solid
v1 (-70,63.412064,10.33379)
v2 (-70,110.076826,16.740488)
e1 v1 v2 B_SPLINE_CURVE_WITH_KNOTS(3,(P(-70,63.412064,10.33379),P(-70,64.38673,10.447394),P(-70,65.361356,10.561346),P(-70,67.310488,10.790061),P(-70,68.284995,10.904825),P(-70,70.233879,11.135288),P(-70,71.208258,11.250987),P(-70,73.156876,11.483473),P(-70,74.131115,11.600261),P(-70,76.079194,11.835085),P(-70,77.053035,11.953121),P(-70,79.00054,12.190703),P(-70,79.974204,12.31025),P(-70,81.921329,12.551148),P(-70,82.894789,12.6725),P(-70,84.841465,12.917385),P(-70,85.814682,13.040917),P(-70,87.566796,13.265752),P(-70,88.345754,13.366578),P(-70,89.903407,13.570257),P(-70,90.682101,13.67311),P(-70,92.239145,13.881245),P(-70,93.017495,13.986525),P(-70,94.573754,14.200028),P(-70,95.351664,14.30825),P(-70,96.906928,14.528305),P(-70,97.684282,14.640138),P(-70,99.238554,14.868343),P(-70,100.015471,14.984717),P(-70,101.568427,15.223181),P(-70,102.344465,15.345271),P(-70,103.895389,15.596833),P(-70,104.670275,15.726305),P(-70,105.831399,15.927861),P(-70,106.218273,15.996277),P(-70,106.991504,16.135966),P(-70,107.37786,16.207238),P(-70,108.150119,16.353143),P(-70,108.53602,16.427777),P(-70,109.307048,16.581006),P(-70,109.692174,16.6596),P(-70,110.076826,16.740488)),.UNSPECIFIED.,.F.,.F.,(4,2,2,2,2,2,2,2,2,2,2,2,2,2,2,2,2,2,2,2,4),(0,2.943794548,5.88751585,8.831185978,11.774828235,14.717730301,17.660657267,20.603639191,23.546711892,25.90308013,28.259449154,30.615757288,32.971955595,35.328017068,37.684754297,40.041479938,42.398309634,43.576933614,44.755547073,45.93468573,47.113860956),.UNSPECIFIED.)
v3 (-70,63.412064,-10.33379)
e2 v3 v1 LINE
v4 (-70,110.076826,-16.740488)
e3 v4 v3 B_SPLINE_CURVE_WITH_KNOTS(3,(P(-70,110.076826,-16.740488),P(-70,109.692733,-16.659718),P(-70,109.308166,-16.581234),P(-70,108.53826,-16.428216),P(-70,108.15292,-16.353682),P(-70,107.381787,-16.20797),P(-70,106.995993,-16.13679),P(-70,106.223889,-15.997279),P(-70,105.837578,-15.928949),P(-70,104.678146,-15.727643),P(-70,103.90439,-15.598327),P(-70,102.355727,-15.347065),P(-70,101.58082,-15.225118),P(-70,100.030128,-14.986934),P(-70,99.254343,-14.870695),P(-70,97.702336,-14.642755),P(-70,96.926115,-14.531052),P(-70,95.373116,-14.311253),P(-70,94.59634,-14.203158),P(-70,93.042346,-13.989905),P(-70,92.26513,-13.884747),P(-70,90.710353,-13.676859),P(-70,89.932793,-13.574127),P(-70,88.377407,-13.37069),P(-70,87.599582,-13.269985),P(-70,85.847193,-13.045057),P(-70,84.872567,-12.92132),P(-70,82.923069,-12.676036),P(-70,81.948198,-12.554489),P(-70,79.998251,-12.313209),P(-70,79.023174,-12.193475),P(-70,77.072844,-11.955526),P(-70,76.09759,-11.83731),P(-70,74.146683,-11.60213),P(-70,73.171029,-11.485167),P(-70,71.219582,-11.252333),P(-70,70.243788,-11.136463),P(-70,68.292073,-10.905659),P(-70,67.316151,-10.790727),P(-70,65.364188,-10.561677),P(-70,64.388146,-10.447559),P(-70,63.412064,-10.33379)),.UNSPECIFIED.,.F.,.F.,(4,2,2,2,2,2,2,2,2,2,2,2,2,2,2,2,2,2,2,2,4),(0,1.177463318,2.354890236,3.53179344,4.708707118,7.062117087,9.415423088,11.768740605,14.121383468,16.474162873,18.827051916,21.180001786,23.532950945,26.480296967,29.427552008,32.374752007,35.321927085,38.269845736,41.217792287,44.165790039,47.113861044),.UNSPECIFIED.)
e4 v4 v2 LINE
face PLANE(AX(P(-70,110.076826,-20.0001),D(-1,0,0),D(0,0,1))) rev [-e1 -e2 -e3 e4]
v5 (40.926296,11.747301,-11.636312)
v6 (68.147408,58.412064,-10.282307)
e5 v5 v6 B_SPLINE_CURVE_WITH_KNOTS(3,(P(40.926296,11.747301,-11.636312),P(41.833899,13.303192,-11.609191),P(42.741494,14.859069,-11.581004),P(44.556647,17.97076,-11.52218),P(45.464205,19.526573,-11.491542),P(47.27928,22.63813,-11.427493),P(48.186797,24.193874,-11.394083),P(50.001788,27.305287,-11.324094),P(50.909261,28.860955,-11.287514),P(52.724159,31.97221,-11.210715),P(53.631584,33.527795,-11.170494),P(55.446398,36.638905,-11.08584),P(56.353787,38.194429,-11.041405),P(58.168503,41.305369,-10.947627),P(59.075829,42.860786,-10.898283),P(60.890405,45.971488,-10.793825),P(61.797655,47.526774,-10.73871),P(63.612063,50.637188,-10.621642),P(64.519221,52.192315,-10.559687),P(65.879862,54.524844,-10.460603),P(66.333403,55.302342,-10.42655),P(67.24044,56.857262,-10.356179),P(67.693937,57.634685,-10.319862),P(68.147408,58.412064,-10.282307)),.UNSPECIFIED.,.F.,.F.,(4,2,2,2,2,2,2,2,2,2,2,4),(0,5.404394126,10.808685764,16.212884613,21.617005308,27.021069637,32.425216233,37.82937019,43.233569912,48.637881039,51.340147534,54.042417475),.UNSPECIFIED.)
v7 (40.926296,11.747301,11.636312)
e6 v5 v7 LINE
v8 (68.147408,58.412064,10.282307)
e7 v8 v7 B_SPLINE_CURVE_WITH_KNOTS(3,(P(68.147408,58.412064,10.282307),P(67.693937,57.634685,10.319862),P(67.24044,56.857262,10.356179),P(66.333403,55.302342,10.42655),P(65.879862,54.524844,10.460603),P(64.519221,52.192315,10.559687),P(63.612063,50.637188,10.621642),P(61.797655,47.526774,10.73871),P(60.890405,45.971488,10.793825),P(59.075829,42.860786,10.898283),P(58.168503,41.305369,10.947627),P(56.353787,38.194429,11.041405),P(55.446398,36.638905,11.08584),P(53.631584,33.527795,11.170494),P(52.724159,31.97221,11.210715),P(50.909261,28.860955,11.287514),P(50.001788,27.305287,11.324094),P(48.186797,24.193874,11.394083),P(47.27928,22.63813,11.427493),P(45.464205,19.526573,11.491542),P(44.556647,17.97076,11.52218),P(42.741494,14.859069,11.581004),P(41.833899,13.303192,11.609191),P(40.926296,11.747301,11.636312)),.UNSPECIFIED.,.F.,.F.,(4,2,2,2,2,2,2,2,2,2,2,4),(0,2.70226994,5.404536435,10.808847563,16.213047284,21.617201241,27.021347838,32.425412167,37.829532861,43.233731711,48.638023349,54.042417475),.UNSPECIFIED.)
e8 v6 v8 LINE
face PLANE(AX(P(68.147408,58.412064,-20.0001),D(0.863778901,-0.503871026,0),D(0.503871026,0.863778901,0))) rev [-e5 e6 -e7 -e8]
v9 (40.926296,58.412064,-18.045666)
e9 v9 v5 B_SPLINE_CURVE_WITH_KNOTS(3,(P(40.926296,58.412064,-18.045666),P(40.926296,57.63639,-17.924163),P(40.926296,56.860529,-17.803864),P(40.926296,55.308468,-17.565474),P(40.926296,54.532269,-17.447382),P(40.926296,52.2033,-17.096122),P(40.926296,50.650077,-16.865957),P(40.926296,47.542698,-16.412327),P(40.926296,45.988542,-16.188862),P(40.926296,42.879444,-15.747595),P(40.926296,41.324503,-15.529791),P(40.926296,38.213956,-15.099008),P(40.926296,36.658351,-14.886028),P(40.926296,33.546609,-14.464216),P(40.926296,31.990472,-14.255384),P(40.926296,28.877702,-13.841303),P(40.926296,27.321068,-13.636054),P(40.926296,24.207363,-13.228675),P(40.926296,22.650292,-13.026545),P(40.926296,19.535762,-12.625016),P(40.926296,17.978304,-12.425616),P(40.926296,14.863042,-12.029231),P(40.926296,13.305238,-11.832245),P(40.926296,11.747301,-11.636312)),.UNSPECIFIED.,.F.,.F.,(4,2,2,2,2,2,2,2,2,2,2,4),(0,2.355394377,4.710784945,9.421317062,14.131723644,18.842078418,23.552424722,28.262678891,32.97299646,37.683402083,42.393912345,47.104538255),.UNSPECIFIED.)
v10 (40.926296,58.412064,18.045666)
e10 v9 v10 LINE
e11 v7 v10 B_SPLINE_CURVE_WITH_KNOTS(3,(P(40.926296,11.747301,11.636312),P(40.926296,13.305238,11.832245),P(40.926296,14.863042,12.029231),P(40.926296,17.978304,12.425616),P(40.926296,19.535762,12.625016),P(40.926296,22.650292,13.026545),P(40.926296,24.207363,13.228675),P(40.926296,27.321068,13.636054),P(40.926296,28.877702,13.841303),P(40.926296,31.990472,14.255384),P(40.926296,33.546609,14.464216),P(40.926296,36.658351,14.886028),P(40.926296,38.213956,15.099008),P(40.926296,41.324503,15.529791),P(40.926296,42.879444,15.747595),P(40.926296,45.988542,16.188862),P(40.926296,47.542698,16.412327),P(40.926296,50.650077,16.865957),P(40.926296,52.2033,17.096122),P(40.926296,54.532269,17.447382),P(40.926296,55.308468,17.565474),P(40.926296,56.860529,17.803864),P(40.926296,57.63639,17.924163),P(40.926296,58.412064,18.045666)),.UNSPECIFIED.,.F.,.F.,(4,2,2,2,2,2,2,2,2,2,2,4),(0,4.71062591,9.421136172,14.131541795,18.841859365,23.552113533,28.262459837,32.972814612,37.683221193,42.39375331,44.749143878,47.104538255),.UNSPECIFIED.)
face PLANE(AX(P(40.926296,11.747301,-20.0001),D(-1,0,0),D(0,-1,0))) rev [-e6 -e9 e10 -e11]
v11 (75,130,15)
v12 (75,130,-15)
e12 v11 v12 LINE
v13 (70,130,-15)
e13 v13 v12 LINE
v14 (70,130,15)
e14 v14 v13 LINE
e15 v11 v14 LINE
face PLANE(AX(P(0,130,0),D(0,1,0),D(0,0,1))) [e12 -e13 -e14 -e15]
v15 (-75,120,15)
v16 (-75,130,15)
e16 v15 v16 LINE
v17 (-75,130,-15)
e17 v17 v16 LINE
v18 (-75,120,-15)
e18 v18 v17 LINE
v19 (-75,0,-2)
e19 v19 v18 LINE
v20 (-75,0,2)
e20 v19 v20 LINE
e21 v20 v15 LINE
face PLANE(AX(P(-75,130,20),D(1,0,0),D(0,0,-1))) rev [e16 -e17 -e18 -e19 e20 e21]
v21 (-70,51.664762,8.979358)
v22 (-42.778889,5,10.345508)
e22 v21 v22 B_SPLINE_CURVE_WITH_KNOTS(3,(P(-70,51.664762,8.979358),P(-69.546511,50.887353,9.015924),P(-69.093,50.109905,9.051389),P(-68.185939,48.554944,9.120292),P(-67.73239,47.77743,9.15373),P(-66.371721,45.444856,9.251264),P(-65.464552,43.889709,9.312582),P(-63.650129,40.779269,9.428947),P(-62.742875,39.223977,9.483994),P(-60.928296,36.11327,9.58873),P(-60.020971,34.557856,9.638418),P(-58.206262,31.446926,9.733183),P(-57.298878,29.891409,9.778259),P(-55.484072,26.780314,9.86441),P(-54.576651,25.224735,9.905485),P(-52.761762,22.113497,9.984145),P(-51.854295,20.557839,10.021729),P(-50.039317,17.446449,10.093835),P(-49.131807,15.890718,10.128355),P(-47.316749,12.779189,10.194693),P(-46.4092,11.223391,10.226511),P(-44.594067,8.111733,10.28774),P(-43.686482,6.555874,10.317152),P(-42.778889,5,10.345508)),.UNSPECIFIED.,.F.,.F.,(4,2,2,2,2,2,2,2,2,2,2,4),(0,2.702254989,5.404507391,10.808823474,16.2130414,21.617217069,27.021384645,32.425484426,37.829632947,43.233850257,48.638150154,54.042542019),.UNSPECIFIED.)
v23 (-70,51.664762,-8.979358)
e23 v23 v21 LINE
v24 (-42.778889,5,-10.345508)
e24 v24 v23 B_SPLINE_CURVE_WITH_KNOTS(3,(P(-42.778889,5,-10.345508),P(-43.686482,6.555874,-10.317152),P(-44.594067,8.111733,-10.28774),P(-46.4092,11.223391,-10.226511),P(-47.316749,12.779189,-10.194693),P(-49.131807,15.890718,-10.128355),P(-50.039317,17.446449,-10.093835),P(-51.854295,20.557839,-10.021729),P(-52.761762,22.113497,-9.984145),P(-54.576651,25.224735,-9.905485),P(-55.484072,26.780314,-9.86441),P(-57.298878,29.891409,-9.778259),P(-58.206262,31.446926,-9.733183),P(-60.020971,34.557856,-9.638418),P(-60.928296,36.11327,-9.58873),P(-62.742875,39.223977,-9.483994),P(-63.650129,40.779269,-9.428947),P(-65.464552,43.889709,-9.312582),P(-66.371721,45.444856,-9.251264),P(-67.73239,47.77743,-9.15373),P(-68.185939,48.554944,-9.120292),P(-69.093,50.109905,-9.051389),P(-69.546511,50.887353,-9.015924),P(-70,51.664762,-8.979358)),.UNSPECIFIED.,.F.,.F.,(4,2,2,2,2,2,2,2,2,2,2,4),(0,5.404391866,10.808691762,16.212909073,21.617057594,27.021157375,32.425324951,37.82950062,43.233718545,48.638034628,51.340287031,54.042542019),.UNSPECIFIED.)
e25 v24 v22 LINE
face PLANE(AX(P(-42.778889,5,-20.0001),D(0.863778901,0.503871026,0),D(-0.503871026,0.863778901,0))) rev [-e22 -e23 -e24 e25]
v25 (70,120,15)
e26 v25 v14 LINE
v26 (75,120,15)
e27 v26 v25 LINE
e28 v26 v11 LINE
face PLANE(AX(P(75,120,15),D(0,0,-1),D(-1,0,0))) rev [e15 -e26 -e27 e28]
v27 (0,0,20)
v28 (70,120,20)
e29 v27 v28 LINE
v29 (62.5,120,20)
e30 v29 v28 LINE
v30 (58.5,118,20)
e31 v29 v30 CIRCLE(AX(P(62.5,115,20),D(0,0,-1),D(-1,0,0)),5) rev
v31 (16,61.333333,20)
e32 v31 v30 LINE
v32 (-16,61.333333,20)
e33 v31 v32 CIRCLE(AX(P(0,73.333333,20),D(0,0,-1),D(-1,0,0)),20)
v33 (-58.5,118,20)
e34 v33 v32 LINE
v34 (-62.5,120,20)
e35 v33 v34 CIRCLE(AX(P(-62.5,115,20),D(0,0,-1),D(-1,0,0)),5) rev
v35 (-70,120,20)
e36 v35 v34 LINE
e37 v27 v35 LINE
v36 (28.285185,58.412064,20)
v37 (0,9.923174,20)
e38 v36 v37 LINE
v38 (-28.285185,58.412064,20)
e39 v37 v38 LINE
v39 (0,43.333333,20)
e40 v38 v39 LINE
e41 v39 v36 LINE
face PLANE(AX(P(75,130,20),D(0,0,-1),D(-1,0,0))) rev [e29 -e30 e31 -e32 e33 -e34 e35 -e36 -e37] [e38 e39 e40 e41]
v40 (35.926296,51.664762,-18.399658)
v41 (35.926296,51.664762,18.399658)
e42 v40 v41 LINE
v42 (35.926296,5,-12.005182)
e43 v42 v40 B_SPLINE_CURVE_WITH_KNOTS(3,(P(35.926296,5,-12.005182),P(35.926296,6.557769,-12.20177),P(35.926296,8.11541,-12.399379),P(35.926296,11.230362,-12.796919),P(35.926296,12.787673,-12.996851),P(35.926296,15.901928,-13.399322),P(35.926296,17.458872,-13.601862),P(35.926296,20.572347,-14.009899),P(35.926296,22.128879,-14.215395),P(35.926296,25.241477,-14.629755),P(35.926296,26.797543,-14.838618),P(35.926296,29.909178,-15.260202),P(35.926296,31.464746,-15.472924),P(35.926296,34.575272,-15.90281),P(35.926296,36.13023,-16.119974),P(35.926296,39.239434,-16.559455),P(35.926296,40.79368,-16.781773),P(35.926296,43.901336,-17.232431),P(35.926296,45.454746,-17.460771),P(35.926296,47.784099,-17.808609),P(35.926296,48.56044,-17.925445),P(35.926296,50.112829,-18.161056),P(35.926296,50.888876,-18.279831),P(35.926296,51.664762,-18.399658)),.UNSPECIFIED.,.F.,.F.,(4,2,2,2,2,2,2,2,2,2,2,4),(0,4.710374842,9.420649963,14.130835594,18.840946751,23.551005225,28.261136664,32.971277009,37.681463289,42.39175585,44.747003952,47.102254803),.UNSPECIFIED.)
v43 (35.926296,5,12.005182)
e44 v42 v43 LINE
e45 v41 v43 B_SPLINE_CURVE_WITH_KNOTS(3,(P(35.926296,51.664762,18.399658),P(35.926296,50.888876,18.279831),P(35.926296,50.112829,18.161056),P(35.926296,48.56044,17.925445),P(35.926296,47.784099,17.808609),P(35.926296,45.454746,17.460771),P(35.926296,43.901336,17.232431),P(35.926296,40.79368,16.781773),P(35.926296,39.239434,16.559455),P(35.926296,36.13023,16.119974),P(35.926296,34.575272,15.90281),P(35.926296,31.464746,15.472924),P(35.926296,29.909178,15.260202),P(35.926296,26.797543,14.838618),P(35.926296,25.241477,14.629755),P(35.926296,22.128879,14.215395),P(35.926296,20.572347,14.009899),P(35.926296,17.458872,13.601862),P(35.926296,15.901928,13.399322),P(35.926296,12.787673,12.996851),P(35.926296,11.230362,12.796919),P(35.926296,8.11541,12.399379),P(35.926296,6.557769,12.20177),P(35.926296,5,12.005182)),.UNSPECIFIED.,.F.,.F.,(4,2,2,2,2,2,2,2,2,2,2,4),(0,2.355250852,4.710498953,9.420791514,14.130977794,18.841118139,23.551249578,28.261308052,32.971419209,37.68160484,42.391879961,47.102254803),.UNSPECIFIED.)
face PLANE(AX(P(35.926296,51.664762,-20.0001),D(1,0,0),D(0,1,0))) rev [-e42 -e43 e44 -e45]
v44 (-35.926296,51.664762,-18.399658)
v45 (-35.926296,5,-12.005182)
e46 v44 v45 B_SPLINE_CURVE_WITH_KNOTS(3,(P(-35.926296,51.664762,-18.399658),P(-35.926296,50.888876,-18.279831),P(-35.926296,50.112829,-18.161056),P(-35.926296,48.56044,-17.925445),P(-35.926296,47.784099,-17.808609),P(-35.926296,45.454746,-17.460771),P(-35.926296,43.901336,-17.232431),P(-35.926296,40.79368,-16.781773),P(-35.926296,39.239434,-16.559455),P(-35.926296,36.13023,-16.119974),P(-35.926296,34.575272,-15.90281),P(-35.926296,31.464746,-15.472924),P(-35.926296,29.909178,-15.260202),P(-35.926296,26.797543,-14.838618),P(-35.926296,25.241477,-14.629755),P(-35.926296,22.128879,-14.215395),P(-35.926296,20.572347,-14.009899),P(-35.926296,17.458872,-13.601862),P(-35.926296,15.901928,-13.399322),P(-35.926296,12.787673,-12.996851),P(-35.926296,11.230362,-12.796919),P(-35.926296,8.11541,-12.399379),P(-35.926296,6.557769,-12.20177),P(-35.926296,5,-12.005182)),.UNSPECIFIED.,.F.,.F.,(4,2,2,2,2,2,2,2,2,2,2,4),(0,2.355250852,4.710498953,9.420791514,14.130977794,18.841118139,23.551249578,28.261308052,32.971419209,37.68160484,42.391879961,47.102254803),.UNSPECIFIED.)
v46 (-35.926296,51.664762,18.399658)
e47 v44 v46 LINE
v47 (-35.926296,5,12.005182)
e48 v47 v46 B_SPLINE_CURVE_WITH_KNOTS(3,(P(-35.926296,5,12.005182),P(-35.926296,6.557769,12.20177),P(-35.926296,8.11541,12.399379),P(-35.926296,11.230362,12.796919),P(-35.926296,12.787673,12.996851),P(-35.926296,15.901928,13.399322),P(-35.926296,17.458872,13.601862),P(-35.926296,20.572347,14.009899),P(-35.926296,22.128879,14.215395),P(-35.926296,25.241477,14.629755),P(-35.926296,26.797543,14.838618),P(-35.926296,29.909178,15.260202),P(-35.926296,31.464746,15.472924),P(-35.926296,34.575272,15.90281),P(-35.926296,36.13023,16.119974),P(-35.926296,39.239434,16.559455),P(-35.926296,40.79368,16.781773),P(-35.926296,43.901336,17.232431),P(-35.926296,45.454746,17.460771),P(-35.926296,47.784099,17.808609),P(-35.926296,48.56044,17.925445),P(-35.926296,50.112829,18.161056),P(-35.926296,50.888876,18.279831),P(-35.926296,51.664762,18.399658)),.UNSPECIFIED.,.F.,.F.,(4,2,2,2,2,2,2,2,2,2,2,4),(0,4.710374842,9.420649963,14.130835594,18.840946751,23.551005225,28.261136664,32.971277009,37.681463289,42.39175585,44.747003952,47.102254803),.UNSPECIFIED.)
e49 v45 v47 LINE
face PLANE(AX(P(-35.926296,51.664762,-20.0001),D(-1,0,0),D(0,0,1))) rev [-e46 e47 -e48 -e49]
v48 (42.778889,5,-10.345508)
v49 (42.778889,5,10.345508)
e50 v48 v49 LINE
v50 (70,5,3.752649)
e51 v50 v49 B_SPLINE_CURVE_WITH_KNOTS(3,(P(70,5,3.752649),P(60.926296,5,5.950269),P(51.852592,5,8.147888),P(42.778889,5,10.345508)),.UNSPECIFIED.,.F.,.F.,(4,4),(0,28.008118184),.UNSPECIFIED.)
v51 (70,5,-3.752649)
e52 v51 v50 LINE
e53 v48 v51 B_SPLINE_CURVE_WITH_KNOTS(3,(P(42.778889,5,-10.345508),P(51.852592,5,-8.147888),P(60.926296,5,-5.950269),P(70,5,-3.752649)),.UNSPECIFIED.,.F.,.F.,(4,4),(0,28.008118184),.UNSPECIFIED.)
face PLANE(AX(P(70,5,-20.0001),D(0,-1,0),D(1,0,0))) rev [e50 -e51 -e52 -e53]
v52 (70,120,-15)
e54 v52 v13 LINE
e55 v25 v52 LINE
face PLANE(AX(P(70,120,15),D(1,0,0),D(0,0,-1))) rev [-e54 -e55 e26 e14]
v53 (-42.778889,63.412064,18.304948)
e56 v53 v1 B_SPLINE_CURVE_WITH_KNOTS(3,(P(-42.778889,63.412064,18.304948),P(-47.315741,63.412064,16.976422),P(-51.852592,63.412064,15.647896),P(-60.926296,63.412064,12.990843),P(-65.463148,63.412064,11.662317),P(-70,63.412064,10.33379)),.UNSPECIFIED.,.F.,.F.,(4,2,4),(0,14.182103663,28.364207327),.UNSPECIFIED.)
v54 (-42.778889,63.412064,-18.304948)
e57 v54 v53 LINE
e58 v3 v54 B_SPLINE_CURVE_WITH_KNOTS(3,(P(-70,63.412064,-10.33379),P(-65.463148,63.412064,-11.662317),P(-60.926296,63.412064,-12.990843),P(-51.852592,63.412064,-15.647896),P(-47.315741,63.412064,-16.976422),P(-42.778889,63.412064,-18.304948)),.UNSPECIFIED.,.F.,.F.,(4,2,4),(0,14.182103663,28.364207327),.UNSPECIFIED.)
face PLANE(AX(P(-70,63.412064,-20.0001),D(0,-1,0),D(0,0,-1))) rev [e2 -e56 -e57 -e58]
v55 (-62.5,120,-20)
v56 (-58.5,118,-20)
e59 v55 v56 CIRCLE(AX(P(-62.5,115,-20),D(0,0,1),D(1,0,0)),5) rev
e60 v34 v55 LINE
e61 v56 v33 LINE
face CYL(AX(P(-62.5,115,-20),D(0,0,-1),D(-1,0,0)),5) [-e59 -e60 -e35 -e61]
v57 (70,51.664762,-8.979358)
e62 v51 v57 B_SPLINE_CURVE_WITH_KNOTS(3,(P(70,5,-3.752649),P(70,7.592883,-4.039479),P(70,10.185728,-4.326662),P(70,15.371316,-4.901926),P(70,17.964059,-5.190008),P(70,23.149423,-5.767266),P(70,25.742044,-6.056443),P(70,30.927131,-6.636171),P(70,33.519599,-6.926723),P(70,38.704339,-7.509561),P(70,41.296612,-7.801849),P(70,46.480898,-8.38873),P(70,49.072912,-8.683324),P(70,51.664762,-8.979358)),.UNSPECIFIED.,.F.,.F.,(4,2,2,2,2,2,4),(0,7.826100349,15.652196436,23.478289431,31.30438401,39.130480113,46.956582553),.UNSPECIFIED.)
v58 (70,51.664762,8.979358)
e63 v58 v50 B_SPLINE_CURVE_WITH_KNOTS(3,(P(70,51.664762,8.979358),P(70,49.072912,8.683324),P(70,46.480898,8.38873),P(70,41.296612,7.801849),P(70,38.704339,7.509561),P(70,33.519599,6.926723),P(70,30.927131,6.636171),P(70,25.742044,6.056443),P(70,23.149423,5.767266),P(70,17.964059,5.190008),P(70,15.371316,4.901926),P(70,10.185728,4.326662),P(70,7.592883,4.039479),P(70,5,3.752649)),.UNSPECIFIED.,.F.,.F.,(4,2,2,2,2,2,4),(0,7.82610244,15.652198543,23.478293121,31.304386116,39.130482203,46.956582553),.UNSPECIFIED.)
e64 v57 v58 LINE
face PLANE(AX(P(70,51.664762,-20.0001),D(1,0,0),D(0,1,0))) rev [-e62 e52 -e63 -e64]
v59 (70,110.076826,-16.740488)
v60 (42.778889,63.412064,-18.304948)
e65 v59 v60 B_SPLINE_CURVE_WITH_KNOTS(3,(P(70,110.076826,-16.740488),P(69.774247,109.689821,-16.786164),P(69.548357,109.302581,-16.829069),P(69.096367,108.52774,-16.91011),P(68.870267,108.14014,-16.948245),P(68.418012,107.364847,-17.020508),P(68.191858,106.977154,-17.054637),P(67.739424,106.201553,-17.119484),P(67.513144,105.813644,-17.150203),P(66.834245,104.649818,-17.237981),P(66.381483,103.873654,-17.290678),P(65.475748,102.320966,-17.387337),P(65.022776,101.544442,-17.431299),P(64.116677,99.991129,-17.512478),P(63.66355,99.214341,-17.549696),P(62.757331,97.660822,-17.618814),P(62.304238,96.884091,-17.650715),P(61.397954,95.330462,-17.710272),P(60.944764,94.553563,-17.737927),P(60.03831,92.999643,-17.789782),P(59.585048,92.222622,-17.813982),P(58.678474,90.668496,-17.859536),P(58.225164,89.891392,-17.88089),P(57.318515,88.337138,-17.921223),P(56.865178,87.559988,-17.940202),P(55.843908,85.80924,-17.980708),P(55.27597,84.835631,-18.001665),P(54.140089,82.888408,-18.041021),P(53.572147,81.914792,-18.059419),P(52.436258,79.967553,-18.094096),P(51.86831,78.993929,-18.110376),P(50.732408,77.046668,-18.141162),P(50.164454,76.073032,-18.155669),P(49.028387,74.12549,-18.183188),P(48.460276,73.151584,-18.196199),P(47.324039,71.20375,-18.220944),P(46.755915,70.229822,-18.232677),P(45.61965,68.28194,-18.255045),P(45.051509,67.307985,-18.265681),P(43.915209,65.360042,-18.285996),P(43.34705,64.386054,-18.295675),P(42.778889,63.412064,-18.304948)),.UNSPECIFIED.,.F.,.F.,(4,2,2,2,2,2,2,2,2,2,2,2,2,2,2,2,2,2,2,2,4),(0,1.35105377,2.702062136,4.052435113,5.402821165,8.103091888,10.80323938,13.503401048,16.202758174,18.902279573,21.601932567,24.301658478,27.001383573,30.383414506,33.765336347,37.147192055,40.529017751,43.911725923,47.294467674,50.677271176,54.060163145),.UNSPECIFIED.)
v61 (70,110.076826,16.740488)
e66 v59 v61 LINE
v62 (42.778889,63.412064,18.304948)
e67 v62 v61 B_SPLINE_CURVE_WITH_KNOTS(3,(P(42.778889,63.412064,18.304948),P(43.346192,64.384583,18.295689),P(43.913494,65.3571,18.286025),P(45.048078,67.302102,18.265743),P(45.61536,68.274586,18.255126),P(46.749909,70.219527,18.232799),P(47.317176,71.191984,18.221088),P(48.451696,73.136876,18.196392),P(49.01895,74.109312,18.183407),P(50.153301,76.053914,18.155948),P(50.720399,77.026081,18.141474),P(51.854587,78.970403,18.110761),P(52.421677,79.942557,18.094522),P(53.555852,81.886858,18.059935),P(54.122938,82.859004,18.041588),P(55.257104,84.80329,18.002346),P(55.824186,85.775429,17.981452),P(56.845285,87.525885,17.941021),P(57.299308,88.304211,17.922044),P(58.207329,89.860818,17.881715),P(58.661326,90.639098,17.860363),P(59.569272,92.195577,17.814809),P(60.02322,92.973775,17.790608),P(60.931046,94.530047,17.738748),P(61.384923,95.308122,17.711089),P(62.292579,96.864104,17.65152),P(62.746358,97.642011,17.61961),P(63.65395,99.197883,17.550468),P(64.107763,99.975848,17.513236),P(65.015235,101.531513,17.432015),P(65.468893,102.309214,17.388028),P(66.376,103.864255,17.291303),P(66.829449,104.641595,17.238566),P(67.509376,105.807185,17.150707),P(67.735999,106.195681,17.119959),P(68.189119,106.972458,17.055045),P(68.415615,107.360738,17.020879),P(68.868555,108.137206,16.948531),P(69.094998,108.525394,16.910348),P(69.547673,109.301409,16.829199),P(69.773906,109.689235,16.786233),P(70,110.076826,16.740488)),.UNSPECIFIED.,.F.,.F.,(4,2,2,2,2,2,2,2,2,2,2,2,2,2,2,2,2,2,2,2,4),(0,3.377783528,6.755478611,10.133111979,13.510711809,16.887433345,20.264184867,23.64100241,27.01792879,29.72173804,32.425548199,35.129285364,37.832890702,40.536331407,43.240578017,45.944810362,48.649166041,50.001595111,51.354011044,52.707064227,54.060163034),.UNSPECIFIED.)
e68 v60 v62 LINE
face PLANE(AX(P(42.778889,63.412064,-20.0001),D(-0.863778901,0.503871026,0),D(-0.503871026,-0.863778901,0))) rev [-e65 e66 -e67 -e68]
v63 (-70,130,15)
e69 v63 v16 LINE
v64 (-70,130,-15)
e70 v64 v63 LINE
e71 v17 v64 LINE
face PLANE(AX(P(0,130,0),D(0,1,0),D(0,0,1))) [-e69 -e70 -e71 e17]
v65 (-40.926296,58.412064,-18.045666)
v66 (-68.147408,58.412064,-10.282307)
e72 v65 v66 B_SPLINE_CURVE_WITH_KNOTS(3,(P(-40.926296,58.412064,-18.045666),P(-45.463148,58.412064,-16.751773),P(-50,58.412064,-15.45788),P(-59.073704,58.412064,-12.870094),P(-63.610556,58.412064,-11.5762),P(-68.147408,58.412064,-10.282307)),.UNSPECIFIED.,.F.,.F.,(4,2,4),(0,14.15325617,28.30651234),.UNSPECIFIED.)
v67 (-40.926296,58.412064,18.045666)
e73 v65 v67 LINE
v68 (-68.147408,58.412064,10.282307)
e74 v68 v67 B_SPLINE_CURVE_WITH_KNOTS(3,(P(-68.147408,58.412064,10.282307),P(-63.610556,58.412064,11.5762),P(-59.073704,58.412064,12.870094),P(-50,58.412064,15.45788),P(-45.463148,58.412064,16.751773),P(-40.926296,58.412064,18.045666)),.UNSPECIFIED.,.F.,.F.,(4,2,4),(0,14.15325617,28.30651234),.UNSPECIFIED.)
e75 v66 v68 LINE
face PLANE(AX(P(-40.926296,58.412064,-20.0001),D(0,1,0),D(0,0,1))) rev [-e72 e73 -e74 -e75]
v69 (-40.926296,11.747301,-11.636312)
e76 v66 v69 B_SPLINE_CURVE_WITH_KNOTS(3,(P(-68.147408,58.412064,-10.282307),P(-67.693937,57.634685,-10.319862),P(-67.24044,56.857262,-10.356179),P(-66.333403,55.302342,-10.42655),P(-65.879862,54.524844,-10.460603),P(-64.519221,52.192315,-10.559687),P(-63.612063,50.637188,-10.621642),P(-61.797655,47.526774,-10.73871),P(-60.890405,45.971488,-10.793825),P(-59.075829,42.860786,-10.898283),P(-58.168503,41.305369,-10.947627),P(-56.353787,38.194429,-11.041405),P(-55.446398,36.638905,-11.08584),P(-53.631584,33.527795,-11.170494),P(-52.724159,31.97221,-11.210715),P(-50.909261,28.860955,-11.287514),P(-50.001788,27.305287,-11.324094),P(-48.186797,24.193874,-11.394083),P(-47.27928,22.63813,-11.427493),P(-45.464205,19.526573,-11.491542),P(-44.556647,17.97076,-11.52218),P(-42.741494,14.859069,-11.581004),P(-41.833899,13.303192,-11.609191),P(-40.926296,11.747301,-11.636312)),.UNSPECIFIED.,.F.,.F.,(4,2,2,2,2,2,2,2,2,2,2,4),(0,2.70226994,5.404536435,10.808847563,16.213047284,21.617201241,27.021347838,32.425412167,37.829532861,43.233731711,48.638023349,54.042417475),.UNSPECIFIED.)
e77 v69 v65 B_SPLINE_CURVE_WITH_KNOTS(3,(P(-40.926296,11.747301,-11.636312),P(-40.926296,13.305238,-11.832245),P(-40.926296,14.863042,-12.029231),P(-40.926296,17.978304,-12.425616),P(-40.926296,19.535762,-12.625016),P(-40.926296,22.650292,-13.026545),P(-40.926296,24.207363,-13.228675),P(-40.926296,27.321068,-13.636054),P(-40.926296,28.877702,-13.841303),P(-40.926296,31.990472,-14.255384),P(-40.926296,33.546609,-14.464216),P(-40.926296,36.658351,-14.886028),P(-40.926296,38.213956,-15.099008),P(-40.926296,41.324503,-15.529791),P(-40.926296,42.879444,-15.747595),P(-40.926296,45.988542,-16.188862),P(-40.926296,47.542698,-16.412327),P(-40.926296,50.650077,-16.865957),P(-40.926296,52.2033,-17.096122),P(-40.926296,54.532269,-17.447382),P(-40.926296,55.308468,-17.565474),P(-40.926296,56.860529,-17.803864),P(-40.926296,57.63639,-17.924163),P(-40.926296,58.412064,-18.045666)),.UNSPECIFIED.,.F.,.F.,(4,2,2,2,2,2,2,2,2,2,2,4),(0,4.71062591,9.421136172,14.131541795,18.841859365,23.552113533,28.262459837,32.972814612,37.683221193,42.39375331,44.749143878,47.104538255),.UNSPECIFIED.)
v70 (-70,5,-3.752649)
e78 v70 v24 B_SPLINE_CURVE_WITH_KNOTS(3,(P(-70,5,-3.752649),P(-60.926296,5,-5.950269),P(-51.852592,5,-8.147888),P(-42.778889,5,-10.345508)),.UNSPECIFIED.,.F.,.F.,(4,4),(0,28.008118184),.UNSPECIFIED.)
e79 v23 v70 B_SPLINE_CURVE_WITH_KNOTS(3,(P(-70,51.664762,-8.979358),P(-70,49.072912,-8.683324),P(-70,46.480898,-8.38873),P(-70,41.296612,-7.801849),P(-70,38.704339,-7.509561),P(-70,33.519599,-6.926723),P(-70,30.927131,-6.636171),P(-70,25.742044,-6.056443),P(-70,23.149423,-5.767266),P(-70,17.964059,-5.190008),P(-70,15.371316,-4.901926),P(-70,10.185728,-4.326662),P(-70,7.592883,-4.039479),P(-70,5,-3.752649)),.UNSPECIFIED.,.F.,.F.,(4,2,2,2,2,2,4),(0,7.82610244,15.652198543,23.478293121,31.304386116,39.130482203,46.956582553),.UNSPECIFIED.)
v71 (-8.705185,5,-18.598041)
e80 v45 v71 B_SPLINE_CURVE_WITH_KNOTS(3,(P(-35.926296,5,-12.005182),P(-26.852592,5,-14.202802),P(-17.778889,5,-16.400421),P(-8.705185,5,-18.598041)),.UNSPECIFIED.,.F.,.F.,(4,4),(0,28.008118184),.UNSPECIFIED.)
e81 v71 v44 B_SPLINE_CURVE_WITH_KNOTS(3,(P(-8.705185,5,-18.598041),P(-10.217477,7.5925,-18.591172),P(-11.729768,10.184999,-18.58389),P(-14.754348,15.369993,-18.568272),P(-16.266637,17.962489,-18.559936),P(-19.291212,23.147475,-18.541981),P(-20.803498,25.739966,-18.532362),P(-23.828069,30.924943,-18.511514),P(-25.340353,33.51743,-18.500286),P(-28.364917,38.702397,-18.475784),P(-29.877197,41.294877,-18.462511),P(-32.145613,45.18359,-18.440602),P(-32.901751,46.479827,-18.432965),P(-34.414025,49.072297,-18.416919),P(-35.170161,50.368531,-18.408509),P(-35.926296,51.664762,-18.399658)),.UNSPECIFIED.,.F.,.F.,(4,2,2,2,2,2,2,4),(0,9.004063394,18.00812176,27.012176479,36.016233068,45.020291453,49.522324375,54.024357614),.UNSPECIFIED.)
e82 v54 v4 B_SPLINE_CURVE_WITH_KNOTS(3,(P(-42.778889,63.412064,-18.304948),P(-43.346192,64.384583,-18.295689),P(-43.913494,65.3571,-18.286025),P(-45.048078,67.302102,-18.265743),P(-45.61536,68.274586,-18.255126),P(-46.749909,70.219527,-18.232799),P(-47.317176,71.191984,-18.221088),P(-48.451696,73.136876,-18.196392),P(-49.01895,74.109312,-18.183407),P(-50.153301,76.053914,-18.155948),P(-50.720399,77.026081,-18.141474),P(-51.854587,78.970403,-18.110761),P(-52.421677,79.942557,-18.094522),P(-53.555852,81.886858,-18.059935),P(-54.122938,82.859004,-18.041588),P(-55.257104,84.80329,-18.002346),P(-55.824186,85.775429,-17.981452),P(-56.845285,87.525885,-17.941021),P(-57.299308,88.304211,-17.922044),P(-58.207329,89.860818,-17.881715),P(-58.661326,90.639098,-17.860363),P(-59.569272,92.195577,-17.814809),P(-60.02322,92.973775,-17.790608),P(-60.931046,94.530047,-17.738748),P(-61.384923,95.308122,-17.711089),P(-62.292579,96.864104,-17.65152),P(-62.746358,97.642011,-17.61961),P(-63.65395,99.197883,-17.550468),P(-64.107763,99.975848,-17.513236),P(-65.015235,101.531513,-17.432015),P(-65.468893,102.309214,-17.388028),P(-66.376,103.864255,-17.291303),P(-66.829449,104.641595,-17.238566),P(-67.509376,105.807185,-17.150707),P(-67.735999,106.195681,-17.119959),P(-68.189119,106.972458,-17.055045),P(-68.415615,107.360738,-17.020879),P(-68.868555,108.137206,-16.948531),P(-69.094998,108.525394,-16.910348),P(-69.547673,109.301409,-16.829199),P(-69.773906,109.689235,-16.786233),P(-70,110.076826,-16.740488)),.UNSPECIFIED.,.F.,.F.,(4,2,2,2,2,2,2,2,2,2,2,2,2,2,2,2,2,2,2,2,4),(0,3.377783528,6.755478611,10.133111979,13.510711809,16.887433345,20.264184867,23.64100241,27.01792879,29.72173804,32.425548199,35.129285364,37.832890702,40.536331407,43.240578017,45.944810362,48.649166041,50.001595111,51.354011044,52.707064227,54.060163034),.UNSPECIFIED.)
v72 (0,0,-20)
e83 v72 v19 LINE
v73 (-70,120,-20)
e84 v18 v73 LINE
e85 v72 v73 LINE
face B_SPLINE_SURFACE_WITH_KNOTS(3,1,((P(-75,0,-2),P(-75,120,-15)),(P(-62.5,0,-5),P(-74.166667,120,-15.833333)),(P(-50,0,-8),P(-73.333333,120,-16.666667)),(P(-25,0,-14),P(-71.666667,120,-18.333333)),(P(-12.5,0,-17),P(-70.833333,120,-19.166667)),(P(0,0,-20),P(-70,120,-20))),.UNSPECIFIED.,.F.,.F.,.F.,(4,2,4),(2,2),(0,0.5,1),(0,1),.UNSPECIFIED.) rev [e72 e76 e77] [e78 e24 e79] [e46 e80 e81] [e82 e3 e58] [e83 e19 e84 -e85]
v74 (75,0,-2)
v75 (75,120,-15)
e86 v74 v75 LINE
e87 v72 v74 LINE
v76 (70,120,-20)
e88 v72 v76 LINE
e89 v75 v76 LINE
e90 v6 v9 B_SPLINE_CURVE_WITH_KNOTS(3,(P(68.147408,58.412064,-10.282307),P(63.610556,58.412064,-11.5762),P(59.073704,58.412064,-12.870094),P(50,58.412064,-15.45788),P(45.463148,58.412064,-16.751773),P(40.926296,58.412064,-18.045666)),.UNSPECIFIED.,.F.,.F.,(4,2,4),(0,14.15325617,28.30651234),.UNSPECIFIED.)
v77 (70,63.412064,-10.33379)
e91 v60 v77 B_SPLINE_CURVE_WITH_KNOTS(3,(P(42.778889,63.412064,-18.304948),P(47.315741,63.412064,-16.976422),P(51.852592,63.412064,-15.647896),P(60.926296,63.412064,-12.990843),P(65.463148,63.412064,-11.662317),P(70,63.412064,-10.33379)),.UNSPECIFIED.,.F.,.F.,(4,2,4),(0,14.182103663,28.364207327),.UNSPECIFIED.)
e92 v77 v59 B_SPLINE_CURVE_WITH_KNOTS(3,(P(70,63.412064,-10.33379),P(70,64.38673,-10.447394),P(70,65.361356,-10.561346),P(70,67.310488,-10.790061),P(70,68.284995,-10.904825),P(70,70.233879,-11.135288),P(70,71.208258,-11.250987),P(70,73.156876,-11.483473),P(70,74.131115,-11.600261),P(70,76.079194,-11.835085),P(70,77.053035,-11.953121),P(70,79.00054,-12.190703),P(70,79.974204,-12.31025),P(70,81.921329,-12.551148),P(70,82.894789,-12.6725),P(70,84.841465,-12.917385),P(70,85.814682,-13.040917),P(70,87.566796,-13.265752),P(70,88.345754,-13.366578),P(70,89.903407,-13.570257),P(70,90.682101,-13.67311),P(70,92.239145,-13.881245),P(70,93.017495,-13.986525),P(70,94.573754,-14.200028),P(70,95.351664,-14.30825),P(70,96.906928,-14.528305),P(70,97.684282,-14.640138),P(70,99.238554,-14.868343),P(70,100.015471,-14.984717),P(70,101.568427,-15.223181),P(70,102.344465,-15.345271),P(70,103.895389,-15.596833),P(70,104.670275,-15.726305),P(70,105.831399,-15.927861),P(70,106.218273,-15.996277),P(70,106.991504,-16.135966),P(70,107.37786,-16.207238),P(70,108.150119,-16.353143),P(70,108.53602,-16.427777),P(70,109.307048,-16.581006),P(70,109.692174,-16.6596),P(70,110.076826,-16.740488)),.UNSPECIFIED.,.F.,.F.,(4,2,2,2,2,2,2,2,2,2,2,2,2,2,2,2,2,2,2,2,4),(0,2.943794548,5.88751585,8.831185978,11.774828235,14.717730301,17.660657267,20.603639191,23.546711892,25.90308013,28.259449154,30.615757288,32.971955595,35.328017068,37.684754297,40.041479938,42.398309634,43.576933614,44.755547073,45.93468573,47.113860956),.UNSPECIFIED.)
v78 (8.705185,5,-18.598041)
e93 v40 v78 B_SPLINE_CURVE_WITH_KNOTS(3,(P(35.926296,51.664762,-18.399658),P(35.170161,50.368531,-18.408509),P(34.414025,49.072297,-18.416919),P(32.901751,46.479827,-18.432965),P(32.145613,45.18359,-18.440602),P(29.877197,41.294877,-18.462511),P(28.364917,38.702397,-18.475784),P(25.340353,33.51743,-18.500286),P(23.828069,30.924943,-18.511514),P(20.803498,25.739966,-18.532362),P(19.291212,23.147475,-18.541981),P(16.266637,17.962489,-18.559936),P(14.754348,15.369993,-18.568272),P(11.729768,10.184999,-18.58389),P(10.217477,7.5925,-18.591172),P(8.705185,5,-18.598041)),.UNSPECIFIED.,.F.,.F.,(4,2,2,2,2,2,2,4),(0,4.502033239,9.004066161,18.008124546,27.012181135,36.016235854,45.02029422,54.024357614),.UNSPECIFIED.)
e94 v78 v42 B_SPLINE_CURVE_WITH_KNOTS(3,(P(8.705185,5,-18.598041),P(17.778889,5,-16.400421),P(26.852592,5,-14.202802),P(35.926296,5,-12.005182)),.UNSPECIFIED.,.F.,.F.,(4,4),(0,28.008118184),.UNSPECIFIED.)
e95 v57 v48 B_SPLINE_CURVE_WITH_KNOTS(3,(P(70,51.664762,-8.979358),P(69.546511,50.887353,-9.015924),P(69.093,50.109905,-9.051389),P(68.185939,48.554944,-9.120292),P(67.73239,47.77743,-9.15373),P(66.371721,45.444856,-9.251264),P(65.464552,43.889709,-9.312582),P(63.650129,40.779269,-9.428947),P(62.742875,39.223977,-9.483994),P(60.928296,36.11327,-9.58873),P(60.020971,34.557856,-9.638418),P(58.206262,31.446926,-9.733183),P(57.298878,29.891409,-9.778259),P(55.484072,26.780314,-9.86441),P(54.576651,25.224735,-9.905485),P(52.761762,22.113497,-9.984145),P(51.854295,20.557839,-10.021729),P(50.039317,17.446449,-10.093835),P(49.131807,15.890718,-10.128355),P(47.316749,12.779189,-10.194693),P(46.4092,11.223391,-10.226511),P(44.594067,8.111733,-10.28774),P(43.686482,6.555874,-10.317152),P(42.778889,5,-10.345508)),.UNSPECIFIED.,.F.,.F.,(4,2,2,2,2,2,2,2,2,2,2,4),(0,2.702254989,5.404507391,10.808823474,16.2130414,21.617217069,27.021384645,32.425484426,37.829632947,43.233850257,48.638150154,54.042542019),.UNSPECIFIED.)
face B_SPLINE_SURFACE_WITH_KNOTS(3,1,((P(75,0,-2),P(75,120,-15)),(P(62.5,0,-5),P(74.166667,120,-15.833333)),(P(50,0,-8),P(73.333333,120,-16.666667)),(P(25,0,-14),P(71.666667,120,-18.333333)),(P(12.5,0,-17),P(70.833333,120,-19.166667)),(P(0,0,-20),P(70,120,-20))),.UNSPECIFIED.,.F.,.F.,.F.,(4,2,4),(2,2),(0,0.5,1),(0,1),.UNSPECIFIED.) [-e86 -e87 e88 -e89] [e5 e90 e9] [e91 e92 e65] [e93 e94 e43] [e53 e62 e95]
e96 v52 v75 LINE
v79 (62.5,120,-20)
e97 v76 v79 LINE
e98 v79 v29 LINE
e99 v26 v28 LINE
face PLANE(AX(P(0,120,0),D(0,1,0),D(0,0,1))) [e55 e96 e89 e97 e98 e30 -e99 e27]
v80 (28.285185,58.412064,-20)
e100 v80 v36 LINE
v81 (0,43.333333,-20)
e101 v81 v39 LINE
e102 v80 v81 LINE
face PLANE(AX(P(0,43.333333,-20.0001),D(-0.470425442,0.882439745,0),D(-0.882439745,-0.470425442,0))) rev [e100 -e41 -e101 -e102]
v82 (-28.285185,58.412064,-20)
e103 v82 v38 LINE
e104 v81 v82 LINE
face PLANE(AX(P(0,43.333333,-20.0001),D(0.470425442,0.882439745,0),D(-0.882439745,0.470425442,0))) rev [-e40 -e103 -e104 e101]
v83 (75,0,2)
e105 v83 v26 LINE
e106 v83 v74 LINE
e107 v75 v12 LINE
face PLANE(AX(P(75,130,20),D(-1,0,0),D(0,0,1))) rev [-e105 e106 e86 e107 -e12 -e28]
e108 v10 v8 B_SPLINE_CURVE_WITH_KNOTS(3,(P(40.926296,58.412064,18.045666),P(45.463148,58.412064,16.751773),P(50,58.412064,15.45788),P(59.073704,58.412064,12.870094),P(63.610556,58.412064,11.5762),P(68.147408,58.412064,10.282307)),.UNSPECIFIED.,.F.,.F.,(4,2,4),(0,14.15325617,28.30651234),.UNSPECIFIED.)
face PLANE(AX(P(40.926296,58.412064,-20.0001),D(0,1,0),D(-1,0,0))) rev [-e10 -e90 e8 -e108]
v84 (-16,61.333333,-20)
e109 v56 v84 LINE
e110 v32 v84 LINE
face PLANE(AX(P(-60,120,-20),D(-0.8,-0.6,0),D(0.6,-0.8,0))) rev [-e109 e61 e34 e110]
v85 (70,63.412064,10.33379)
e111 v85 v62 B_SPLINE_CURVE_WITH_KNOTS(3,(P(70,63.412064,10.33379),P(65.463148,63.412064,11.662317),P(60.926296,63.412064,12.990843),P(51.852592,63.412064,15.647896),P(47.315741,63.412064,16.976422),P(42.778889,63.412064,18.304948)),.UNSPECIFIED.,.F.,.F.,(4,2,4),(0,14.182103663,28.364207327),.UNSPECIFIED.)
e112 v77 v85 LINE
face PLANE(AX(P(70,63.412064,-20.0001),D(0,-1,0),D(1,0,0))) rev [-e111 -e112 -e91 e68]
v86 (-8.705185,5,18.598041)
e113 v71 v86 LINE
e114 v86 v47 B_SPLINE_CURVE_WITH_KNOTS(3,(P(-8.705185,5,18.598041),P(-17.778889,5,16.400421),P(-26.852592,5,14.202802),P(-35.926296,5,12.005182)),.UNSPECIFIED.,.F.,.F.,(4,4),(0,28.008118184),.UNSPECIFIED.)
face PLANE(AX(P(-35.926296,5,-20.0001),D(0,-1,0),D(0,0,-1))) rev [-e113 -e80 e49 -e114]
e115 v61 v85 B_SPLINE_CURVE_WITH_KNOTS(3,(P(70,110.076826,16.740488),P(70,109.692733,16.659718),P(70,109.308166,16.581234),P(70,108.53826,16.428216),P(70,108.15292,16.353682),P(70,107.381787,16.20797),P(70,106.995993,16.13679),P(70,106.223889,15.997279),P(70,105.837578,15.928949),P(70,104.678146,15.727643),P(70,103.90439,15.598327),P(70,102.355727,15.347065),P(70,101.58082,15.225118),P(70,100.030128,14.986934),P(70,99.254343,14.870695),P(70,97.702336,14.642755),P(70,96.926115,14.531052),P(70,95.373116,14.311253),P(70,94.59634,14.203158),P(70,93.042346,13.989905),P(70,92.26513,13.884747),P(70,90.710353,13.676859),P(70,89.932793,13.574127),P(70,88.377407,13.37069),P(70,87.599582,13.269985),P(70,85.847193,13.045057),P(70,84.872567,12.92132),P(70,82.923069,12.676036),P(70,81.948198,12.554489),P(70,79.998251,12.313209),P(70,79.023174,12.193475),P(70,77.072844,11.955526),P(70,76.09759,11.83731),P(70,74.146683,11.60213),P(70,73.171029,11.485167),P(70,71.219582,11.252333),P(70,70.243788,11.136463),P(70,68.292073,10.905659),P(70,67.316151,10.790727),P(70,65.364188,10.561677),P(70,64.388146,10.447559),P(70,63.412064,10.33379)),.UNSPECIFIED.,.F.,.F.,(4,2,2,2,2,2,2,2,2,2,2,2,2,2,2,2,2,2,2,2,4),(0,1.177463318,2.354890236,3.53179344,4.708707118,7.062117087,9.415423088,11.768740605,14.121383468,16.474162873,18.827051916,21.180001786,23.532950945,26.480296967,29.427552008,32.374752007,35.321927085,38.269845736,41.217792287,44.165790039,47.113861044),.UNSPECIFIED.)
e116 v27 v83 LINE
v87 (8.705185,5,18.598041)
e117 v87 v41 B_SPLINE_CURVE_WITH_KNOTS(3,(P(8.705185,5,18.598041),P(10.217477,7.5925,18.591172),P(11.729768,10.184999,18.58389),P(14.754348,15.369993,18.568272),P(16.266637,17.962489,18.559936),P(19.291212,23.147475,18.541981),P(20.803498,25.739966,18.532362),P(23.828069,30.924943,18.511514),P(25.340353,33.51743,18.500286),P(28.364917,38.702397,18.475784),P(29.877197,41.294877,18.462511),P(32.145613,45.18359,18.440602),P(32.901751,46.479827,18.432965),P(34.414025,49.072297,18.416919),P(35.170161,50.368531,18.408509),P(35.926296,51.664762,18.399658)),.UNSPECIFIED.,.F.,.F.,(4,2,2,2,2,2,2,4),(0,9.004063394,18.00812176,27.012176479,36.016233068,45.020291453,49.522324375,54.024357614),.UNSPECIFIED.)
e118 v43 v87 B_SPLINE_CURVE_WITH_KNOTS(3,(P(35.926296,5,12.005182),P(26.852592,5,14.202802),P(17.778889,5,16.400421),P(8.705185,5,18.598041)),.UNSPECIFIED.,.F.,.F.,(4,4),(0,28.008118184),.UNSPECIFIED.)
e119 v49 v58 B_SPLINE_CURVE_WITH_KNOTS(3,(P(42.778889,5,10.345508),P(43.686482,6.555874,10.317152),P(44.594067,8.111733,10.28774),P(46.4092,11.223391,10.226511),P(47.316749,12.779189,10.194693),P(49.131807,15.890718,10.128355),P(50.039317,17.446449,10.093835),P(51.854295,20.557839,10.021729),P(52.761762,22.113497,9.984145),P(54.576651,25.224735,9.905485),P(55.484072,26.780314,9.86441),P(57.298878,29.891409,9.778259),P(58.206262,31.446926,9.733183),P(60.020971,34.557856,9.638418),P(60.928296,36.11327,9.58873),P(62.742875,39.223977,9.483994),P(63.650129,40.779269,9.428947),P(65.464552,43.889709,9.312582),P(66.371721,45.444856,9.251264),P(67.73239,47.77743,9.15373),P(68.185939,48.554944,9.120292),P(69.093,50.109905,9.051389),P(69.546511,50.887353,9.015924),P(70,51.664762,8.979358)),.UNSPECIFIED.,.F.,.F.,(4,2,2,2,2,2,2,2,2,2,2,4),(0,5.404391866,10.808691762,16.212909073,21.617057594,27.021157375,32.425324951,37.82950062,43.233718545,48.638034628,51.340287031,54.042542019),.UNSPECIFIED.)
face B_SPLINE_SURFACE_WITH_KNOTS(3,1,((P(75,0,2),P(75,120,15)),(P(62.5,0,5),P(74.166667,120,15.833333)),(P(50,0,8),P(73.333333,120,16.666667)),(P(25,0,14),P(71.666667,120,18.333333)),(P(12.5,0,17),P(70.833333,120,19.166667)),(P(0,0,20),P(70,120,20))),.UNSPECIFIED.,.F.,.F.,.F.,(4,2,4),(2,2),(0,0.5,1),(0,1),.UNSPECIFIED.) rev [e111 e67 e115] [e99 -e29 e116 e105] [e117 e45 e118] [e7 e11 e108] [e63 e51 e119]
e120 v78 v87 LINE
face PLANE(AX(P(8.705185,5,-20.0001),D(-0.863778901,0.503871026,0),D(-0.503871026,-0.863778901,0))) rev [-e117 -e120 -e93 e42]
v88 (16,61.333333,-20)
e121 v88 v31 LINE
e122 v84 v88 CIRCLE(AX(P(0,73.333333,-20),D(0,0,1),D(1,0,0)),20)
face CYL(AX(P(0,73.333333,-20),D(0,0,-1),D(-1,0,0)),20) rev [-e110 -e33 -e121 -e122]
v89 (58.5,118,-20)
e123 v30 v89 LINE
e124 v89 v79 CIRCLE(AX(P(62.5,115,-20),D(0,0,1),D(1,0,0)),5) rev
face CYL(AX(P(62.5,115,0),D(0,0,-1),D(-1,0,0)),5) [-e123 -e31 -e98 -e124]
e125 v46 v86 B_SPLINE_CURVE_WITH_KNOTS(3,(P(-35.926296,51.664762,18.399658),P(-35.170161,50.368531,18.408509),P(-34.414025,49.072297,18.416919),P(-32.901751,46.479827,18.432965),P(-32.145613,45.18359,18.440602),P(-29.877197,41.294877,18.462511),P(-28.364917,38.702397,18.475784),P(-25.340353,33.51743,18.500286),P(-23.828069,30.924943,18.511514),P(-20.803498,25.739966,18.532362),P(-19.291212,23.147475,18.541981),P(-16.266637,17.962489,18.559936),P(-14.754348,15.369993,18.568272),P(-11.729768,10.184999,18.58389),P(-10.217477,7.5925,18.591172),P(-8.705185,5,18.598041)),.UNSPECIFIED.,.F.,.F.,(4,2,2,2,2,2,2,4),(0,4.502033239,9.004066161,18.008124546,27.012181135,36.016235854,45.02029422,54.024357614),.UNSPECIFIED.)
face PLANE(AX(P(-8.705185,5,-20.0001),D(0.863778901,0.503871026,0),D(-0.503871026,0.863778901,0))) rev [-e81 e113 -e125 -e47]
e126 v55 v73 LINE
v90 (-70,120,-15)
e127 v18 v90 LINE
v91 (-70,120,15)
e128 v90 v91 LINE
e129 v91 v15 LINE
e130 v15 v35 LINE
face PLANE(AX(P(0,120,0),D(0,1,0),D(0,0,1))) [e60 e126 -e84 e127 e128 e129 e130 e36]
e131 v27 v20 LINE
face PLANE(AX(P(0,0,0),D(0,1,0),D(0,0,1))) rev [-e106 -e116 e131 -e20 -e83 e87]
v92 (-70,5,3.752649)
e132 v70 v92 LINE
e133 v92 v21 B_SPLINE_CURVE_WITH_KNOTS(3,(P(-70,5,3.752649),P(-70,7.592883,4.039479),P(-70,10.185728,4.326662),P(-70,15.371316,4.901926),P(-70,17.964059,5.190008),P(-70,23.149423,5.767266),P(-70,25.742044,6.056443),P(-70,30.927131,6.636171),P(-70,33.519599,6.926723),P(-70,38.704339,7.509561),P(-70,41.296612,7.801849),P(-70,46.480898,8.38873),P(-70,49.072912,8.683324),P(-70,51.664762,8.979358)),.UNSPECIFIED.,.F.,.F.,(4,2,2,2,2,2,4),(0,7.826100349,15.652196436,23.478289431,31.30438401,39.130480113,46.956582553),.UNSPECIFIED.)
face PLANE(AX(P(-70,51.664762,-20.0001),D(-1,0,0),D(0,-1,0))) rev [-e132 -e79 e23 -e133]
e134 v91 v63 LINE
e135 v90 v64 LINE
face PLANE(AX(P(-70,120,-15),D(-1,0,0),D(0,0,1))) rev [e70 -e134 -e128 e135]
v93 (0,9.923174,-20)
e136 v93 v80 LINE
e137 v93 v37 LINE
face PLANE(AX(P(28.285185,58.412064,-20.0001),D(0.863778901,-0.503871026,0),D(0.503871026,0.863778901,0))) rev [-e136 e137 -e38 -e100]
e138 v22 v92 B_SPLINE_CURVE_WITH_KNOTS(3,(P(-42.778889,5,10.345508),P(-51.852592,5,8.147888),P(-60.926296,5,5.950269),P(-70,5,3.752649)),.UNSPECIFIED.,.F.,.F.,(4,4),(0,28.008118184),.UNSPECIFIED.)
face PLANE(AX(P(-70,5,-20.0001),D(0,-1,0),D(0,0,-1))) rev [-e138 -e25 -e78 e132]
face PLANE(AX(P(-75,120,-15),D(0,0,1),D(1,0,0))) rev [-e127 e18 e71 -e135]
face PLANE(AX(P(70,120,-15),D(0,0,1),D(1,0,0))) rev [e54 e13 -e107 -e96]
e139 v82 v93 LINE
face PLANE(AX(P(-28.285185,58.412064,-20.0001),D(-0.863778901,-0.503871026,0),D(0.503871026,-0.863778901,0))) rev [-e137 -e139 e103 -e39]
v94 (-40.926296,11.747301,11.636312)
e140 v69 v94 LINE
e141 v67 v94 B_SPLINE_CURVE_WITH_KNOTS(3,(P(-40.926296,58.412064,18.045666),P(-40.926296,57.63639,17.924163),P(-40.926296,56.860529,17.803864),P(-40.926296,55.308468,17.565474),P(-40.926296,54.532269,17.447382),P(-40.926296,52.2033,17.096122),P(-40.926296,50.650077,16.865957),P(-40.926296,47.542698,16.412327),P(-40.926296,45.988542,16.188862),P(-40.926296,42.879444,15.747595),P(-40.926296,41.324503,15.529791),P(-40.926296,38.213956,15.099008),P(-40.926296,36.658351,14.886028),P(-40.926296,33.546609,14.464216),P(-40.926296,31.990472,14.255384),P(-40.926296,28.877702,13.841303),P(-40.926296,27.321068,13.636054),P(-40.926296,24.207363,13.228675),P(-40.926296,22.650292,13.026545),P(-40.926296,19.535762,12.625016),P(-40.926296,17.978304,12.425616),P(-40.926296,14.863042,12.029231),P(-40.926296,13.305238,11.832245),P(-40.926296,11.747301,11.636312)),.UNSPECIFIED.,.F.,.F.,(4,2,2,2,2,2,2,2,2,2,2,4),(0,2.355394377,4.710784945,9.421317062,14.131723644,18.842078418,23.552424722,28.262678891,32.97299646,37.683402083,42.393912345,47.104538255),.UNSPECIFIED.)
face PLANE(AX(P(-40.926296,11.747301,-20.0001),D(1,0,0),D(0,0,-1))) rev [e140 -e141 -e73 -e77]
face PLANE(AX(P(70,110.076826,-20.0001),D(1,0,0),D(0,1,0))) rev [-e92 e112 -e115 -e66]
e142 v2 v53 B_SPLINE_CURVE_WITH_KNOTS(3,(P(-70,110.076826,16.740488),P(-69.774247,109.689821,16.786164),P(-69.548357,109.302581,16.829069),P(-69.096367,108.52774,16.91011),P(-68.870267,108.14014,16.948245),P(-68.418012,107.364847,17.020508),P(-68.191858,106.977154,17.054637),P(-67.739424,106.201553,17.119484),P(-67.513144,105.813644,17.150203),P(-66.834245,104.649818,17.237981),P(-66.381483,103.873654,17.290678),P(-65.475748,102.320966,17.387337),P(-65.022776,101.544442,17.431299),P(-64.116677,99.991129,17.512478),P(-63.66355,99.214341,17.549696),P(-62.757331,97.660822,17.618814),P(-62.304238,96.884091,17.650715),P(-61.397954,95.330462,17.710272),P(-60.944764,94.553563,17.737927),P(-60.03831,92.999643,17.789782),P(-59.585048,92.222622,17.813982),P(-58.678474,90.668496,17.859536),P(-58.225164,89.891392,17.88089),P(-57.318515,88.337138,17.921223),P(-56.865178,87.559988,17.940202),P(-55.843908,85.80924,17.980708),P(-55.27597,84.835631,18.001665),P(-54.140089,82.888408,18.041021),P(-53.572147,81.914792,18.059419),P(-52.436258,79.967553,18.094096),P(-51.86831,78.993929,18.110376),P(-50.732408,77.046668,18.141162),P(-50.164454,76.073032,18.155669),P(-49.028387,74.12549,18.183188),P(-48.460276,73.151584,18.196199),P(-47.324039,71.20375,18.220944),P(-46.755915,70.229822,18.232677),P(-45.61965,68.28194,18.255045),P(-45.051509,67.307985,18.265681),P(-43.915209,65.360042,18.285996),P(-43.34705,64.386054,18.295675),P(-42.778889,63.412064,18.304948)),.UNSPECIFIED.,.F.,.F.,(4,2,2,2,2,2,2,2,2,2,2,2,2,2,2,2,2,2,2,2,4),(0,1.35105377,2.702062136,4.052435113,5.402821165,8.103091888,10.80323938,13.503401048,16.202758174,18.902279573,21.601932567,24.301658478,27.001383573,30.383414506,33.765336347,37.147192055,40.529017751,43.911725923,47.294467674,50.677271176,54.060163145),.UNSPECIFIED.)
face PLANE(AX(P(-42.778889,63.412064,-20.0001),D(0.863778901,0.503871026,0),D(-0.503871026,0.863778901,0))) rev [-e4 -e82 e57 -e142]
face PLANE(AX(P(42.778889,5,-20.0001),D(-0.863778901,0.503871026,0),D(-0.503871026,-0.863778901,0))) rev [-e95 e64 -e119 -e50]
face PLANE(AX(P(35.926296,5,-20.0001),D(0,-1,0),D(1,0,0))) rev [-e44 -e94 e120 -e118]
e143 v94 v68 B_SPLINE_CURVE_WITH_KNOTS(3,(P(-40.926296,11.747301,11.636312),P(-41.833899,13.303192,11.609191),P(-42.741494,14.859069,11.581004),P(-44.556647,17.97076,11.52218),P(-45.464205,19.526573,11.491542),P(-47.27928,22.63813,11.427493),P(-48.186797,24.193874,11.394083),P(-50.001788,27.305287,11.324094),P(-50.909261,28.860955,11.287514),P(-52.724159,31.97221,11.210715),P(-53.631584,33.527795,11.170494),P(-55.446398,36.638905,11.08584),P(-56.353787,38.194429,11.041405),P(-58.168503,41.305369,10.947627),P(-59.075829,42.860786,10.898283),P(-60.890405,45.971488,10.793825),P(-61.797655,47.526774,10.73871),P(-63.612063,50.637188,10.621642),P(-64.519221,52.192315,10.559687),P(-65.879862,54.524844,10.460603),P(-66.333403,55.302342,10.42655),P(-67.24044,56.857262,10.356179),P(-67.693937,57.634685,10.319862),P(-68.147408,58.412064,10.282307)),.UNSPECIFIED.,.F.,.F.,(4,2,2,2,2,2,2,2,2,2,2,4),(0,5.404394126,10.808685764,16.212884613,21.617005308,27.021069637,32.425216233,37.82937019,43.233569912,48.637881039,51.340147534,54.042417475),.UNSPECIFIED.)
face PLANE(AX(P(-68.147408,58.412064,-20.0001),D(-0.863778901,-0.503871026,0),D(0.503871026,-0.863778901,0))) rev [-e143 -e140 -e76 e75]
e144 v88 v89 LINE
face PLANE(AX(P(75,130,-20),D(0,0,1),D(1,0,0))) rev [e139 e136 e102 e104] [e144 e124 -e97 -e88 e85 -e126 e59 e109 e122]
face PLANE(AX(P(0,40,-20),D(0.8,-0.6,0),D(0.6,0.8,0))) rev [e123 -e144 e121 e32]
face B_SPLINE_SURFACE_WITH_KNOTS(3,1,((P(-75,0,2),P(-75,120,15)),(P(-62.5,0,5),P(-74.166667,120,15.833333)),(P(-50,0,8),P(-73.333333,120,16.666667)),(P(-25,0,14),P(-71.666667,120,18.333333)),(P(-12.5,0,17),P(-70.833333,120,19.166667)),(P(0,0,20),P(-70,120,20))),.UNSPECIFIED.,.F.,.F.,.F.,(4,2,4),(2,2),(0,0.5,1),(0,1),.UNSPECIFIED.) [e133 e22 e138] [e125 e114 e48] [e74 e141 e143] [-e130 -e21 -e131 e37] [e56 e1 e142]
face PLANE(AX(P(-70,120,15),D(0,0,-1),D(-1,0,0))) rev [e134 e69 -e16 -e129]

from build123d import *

# Parameters (mm, degrees)
SKETCH6_W               = 150
SKETCH6_H               = 40
BOSS_EXTRUDE1_DEPTH     = 130
CUT_EXTRUDE1_DEPTH      = 10
CUT_EXTRUDE2_DEPTH      = 152.410039297
CUT_EXTRUDE2_DEPTH_BACK = 152.410039297
FILLET1_R               = 20
FILLET2_R               = 5
CUT_EXTRUDE3_DEPTH      = 152.410039446
CUT_EXTRUDE3_DEPTH_BACK = 152.410039446


# Read off the part's stored shape, not the designer's step: Mirror2
with BuildPart() as part:
    # Sketch6 → Boss-Extrude1 (new body)
    with BuildSketch(Plane(origin=(0, 0, 0), x_dir=(1, 0, 0), z_dir=(0, 1, 0))):
        Rectangle(SKETCH6_W, SKETCH6_H)
    extrude(amount=BOSS_EXTRUDE1_DEPTH)

    # Sketch7 → Cut-Extrude1 (cut)
    with BuildSketch(Plane(origin=(0, 130, 0), x_dir=(1, 0, 0), z_dir=(0, 1, 0))):
        Polygon((-75, 20), (-75, 15), (-70, 15), (-70, -15), (-75, -15), (-75, -20), (75, -20), (75, -15), (70, -15), (70, 15), (75, 15), (75, 20), align=None)
    extrude(amount=-CUT_EXTRUDE1_DEPTH, mode=Mode.SUBTRACT)

    # Sketch8 → Cut-Extrude2 (cut, two sides: drawn at the far end of the back side and taken through both)
    with BuildSketch(Plane.XY.offset(-CUT_EXTRUDE2_DEPTH_BACK)):
        Polygon((-60, 120), (0, 40), (60, 120), align=None)
    extrude(amount=CUT_EXTRUDE2_DEPTH + CUT_EXTRUDE2_DEPTH_BACK, mode=Mode.SUBTRACT)

    # Fillet1
    fillet1_edges = [part.edges().sort_by_distance(p)[0] for p in [
        (0, 40, 0),
    ]]
    fillet(fillet1_edges, radius=FILLET1_R)

    # Fillet2
    fillet2_edges = [part.edges().sort_by_distance(p)[0] for p in [
        (-60, 120, 0),
        (60, 120, 0),
    ]]
    fillet(fillet2_edges, radius=FILLET2_R)

    # Sketch10 → Cut-Loft1 section 0
    with BuildSketch(Plane.XZ):
        with BuildLine():
            Line((75, 20), (75, 2))
            Line((75, 2), (0, 20))
            Line((0, 20), (75, 20))
        make_face()
    # Sketch9 → Cut-Loft1 section 1
    with BuildSketch(Plane(origin=(0, 120, 0), x_dir=(1, 0, 0), z_dir=(0, 1, 0))):
        with BuildLine():
            Line((75, -15), (75, -20))
            Line((75, -20), (70, -20))
            Line((70, -20), (75, -15))
        make_face()
    cut_loft1 = loft(mode=Mode.SUBTRACT)

    # Mirror1: Cut-Loft1 across plane
    add(cut_loft1.mirror(Plane.XY), mode=Mode.SUBTRACT)

    # Mirror2
    split(bisect_by=Plane(origin=(0, 0, 0), x_dir=(0, 0, 1), z_dir=(1, 0, 0)), keep=Keep.TOP)

    # Mirror2 2: part across plane


with BuildPart() as part_1:
    add(part.part)
    add(part.part.mirror(Plane(origin=(0, 0, 0), x_dir=(0, 0, 1), z_dir=(1, 0, 0))))

    # Sketch12 → Cut-Extrude3 (cut, two sides: drawn at the far end of the back side and taken through both)
    with BuildSketch(Plane.XY.offset(-CUT_EXTRUDE3_DEPTH_BACK)):
        Polygon((-70, 110.076825722), (-70, 63.412063573), (-42.778888747, 63.412063573), align=None)
        Polygon((-70, 51.664762149), (-70, 5), (-42.778888747, 5), align=None)
        Polygon((-68.147407502, 58.412063573), (-40.926296249, 11.747301425), (-40.926296249, 58.412063573), align=None)
        Polygon((-35.926296249, 51.664762149), (-35.926296249, 5), (-8.705184996, 5), align=None)
        Polygon((0, 43.333333333), (-28.285185422, 58.412063573), (0, 9.923174278), (28.285185422, 58.412063573), align=None)
        Polygon((40.926296249, 11.747301425), (40.926296249, 58.412063573), (68.147407502, 58.412063573), align=None)
        Polygon((8.705184996, 5), (35.926296249, 51.664762149), (35.926296249, 5), align=None)
        Polygon((70, 5), (42.778888747, 5), (70, 51.664762149), align=None)
        Polygon((70, 63.412063573), (42.778888747, 63.412063573), (70, 110.076825722), align=None)
    extrude(amount=CUT_EXTRUDE3_DEPTH + CUT_EXTRUDE3_DEPTH_BACK, mode=Mode.SUBTRACT)


solid = part_1.part
